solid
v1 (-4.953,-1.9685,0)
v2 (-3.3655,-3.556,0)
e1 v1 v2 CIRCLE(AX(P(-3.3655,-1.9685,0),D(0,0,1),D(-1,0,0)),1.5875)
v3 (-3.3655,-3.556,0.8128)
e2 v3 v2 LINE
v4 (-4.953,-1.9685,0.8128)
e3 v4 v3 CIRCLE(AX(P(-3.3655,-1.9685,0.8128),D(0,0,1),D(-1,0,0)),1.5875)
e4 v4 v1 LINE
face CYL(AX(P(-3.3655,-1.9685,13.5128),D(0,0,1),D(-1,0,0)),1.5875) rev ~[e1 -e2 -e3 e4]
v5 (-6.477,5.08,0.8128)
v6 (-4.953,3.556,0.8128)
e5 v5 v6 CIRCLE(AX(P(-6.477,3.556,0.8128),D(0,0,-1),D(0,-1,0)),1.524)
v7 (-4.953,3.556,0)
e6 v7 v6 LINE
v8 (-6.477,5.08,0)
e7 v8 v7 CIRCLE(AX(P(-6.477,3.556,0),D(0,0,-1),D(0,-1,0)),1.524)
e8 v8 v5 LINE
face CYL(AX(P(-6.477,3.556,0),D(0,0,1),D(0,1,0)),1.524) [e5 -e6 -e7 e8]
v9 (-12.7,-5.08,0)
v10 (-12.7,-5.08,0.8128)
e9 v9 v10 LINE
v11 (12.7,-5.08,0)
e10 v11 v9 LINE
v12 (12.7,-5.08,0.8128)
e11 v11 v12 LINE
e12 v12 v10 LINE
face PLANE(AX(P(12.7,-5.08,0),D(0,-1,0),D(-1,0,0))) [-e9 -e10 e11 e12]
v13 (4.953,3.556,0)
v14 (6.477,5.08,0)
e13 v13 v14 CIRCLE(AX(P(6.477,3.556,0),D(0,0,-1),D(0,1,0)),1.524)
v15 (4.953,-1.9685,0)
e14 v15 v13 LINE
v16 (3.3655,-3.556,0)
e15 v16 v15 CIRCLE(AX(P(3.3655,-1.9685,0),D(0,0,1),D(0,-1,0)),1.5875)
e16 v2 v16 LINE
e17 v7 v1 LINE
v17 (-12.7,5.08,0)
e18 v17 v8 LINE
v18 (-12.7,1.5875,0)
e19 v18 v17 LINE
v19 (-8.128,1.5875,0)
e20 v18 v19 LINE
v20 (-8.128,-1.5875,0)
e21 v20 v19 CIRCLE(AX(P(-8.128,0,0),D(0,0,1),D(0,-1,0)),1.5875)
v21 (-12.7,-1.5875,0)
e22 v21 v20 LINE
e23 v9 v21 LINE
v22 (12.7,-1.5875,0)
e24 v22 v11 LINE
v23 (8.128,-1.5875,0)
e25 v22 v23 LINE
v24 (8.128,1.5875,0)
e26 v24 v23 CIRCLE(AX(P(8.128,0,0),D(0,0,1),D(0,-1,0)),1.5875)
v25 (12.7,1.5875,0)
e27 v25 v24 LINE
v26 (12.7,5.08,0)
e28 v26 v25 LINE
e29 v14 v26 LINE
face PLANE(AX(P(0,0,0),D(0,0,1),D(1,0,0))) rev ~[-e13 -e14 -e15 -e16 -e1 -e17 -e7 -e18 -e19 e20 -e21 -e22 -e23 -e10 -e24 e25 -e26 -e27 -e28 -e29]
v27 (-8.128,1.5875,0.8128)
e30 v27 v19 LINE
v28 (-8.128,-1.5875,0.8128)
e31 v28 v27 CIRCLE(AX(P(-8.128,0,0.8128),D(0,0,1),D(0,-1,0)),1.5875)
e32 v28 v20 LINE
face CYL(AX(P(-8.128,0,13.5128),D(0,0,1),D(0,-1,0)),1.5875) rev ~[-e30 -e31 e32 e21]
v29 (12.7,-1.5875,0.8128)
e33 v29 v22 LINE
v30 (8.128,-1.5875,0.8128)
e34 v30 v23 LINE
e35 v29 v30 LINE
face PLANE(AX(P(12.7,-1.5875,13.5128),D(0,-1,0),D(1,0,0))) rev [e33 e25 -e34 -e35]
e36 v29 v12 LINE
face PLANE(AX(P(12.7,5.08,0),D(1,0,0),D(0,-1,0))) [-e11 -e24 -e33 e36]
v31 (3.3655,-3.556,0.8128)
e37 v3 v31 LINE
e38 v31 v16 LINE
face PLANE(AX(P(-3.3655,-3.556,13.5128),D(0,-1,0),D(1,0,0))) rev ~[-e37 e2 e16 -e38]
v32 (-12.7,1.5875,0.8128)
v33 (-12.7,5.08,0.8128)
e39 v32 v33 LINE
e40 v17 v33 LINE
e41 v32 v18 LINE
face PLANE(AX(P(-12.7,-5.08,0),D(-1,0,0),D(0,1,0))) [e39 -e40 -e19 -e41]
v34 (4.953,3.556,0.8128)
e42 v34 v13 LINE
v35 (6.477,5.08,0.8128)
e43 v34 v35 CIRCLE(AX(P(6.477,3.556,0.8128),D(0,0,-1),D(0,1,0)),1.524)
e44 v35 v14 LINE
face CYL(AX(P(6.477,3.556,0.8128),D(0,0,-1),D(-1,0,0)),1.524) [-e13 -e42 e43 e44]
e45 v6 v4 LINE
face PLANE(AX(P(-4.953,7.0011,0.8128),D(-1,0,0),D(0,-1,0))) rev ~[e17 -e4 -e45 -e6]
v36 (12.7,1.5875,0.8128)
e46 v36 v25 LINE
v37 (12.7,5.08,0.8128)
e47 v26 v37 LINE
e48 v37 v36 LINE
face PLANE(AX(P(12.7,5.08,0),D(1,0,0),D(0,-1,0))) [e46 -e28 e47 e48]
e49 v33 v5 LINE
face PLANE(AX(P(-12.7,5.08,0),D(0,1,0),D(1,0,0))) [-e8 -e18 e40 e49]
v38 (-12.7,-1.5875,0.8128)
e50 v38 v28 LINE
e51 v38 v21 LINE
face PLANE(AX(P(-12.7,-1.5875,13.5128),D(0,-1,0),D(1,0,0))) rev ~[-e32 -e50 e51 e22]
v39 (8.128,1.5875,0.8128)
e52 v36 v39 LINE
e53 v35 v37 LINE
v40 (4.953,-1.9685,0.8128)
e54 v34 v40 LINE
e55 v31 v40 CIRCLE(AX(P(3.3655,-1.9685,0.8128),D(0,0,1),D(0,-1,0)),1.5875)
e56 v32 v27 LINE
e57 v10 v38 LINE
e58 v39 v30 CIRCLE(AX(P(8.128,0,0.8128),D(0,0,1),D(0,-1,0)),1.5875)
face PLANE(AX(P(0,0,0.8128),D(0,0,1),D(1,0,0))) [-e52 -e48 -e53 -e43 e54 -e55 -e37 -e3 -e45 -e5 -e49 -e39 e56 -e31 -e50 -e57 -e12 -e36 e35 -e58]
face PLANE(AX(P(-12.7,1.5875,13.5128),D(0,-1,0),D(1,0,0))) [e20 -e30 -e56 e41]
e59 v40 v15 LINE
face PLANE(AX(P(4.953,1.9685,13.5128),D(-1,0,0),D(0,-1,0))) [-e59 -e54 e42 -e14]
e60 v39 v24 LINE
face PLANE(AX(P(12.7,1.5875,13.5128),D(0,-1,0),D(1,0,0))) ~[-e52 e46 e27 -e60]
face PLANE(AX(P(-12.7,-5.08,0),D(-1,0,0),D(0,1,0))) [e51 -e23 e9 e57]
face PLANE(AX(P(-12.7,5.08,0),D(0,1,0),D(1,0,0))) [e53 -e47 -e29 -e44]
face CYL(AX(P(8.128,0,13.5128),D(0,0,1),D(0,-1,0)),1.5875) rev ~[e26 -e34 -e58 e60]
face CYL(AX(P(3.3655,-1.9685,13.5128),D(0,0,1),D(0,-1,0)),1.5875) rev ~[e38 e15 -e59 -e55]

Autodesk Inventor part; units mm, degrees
ref_plane "YZ Plane" through (0, 0, 0) normal (1, 0, 0) x (0, 1, 0)
ref_plane "XZ Plane" through (0, 0, 0) normal (0, 1, 0) x (-1, 0, 0)
sketch "Sketch1" plane through (0, 0, 0) normal (0, 0, 1) x (1, 0, 0)
  line L0 (-12.7, 5.08) -> (12.7, 5.08)
  line L1 (12.7, 5.08) -> (12.7, -5.08)
  line L2 (12.7, -5.08) -> (-12.7, -5.08)
  line L3 (-12.7, -5.08) -> (-12.7, 5.08)
  point P0 (0, 0)
  point P1 (0, 5.08)
  point P2 (-12.7, 0)
  dimension "d0" = 25.4
  dimension "d1" = 10.16
extrude "Extrusion1" add sketch "Sketch1" along normal blind 0.8128
ref_plane "Work Plane1" through (0, 0, 13.5128) normal (0, 0, 1) x (1, 0, 0)
sketch "Sketch2" plane through (0, 0, 13.5128) normal (0, 0, 1) x (1, 0, 0)
  line L0 (12.7, 5.08) -> (12.7, -5.08) projected
  line L1 (-12.7, 5.08) -> (12.7, 5.08) projected
  line L2 (-12.7, -5.08) -> (-12.7, 5.08) projected
  line L3 (12.7, -5.08) -> (-12.7, -5.08) projected
  line L4 (-3.3655, 3.556) -> (3.3655, 3.556)
  line L5 (-3.3655, -3.556) -> (3.3655, -3.556)
  line L6 (-4.953, 1.9685) -> (-4.953, -1.9685)
  line L7 (4.953, 1.9685) -> (4.953, -1.9685)
  arc A0 (-3.3655, 3.556) -> (-4.953, 1.9685) centre (-3.3655, 1.9685) ccw
  arc A1 (-4.953, -1.9685) -> (-3.3655, -3.556) centre (-3.3655, -1.9685) ccw
  arc A2 (3.3655, -3.556) -> (4.953, -1.9685) centre (3.3655, -1.9685) ccw
  arc A3 (4.953, 1.9685) -> (3.3655, 3.556) centre (3.3655, 1.9685) ccw
  point P0 (0, 0)
  point P1 (0, 3.556)
  point P2 (0, -3.556)
  point P3 (-4.953, 0)
  point P4 (4.953, 0)
  dimension "d5" = 6.731
  dimension "d6" = 6.731
  dimension "d7" = 3.937
  dimension "d8" = 3.937
  dimension "d9" = 4.953
  dimension "d10" = 4.953
  dimension "d11" = 3.556
  dimension "d12" = 3.556
  dimension "d13" = 1.5875
  dimension "d14" = 1.5875
  dimension "d15" = 1.5875
  dimension "d16" = 1.5875
extrude "Extrusion2" cut sketch "Sketch2" against normal blind 25.4 contours L4 A3 L7 A2 L5 A1 L6 A0
sketch "Sketch3" plane through (0, 0, 13.5128) normal (0, 0, 1) x (1, 0, 0)
  arc A0 (-3.3655, 3.556) -> (-4.953, 1.9685) centre (-3.3655, 1.9685) ccw projected
  line L0 (-3.3655, 3.556) -> (3.3655, 3.556) projected
  arc A1 (4.953, 1.9685) -> (3.3655, 3.556) centre (3.3655, 1.9685) ccw projected
  line L1 (4.953, 1.9685) -> (4.953, -1.9685) projected
  arc A2 (3.3655, -3.556) -> (4.953, -1.9685) centre (3.3655, -1.9685) ccw projected
  line L2 (3.3655, -3.556) -> (-3.3655, -3.556) projected
  arc A3 (-4.953, -1.9685) -> (-3.3655, -3.556) centre (-3.3655, -1.9685) ccw projected
  line L3 (-4.953, -1.9685) -> (-4.953, 1.9685) projected
  line L4 (12.7, 5.08) -> (12.7, -5.08) projected
  line L5 (-12.7, 5.08) -> (12.7, 5.08) projected
  line L6 (-12.7, -5.08) -> (-12.7, 5.08) projected
  line L7 (12.7, -5.08) -> (-12.7, -5.08) projected
  line L8 (-12.7, 1.5875) -> (-8.128, 1.5875)
  line L9 (-12.7, -1.5875) -> (-8.128, -1.5875)
  arc A4 (-8.128, -1.5875) -> (-8.128, 1.5875) centre (-8.128, 0) ccw
  point P0 (0, 0)
  dimension "d19" = 4.572
  dimension "d20" = 3.4925
  dimension "d21" = 4.572
  dimension "d22" = 3.175
  dimension "d24" = 1.5875
extrude "Extrusion3" cut sketch "Sketch3" against normal blind 25.4 contours L8 A4 L9 L6
mirror "Mirror1" about plane through (0, 0, 0) normal (1, 0, 0) of "Extrusion3"
sketch "Sketch5" plane through (0, 0, 0.8128) normal (0, 0, 1) x (1, 0, 0)
  line L0 (4.953, 1.9685) -> (4.953, -1.9685) construction
  line L1 (-4.953, -1.9685) -> (4.953, -1.9685)
  line L2 (4.953, -1.9685) -> (4.953, 7.0011)
  line L3 (4.953, 7.0011) -> (-4.953, 7.0011)
  line L4 (-4.953, 7.0011) -> (-4.953, -1.9685)
  point P0 (0, 0)
extrude "Extrusion5" cut sketch "Sketch5" against normal blind 25.4
fillet "Fillet1" radius 1.524 2 edges at (-4.953, 5.08, 0.4064) (4.953, 5.08, 0.4064)
sketch "Sketch6" plane through (0, 0, 0.8128) normal (0, 0, 1) x (1, 0, 0)
  arc A0 (6.477, 5.08) -> (4.953, 3.556) centre (6.477, 3.556) ccw construction
  line L0 (4.953, 3.556) -> (4.953, -1.9685) construction
  arc A1 (3.3655, -3.556) -> (4.953, -1.9685) centre (3.3655, -1.9685) ccw construction
  line L1 (3.3655, -3.556) -> (-3.3655, -3.556) construction
  arc A2 (-4.953, -1.9685) -> (-3.3655, -3.556) centre (-3.3655, -1.9685) ccw construction
  line L2 (-4.953, -1.9685) -> (-4.953, 3.556) construction
  arc A3 (-4.953, 3.556) -> (-6.477, 5.08) centre (-6.477, 3.556) ccw construction
  line L3 (-12.7, 5.08) -> (-6.477, 5.08) construction
  line L4 (-12.7, 1.5875) -> (-12.7, 5.08) construction
  line L5 (-12.7, 1.5875) -> (-8.128, 1.5875) construction
  arc A4 (-8.128, -1.5875) -> (-8.128, 1.5875) centre (-8.128, 0) ccw construction
  line L6 (-8.128, -1.5875) -> (-12.7, -1.5875) construction
  line L7 (-12.7, -5.08) -> (-12.7, -1.5875) construction
  line L8 (12.7, -5.08) -> (-12.7, -5.08) construction
  line L9 (12.7, -1.5875) -> (12.7, -5.08) construction
  line L10 (12.7, -1.5875) -> (8.128, -1.5875) construction
  arc A5 (8.128, 1.5875) -> (8.128, -1.5875) centre (8.128, 0) ccw construction
  line L11 (8.128, 1.5875) -> (12.7, 1.5875) construction
  line L12 (12.7, 5.08) -> (12.7, 1.5875) construction
  line L13 (6.477, 5.08) -> (12.7, 5.08) construction
  point P0 (0, 0)
properties part number "headplate_largerCenter_frontcutout"
